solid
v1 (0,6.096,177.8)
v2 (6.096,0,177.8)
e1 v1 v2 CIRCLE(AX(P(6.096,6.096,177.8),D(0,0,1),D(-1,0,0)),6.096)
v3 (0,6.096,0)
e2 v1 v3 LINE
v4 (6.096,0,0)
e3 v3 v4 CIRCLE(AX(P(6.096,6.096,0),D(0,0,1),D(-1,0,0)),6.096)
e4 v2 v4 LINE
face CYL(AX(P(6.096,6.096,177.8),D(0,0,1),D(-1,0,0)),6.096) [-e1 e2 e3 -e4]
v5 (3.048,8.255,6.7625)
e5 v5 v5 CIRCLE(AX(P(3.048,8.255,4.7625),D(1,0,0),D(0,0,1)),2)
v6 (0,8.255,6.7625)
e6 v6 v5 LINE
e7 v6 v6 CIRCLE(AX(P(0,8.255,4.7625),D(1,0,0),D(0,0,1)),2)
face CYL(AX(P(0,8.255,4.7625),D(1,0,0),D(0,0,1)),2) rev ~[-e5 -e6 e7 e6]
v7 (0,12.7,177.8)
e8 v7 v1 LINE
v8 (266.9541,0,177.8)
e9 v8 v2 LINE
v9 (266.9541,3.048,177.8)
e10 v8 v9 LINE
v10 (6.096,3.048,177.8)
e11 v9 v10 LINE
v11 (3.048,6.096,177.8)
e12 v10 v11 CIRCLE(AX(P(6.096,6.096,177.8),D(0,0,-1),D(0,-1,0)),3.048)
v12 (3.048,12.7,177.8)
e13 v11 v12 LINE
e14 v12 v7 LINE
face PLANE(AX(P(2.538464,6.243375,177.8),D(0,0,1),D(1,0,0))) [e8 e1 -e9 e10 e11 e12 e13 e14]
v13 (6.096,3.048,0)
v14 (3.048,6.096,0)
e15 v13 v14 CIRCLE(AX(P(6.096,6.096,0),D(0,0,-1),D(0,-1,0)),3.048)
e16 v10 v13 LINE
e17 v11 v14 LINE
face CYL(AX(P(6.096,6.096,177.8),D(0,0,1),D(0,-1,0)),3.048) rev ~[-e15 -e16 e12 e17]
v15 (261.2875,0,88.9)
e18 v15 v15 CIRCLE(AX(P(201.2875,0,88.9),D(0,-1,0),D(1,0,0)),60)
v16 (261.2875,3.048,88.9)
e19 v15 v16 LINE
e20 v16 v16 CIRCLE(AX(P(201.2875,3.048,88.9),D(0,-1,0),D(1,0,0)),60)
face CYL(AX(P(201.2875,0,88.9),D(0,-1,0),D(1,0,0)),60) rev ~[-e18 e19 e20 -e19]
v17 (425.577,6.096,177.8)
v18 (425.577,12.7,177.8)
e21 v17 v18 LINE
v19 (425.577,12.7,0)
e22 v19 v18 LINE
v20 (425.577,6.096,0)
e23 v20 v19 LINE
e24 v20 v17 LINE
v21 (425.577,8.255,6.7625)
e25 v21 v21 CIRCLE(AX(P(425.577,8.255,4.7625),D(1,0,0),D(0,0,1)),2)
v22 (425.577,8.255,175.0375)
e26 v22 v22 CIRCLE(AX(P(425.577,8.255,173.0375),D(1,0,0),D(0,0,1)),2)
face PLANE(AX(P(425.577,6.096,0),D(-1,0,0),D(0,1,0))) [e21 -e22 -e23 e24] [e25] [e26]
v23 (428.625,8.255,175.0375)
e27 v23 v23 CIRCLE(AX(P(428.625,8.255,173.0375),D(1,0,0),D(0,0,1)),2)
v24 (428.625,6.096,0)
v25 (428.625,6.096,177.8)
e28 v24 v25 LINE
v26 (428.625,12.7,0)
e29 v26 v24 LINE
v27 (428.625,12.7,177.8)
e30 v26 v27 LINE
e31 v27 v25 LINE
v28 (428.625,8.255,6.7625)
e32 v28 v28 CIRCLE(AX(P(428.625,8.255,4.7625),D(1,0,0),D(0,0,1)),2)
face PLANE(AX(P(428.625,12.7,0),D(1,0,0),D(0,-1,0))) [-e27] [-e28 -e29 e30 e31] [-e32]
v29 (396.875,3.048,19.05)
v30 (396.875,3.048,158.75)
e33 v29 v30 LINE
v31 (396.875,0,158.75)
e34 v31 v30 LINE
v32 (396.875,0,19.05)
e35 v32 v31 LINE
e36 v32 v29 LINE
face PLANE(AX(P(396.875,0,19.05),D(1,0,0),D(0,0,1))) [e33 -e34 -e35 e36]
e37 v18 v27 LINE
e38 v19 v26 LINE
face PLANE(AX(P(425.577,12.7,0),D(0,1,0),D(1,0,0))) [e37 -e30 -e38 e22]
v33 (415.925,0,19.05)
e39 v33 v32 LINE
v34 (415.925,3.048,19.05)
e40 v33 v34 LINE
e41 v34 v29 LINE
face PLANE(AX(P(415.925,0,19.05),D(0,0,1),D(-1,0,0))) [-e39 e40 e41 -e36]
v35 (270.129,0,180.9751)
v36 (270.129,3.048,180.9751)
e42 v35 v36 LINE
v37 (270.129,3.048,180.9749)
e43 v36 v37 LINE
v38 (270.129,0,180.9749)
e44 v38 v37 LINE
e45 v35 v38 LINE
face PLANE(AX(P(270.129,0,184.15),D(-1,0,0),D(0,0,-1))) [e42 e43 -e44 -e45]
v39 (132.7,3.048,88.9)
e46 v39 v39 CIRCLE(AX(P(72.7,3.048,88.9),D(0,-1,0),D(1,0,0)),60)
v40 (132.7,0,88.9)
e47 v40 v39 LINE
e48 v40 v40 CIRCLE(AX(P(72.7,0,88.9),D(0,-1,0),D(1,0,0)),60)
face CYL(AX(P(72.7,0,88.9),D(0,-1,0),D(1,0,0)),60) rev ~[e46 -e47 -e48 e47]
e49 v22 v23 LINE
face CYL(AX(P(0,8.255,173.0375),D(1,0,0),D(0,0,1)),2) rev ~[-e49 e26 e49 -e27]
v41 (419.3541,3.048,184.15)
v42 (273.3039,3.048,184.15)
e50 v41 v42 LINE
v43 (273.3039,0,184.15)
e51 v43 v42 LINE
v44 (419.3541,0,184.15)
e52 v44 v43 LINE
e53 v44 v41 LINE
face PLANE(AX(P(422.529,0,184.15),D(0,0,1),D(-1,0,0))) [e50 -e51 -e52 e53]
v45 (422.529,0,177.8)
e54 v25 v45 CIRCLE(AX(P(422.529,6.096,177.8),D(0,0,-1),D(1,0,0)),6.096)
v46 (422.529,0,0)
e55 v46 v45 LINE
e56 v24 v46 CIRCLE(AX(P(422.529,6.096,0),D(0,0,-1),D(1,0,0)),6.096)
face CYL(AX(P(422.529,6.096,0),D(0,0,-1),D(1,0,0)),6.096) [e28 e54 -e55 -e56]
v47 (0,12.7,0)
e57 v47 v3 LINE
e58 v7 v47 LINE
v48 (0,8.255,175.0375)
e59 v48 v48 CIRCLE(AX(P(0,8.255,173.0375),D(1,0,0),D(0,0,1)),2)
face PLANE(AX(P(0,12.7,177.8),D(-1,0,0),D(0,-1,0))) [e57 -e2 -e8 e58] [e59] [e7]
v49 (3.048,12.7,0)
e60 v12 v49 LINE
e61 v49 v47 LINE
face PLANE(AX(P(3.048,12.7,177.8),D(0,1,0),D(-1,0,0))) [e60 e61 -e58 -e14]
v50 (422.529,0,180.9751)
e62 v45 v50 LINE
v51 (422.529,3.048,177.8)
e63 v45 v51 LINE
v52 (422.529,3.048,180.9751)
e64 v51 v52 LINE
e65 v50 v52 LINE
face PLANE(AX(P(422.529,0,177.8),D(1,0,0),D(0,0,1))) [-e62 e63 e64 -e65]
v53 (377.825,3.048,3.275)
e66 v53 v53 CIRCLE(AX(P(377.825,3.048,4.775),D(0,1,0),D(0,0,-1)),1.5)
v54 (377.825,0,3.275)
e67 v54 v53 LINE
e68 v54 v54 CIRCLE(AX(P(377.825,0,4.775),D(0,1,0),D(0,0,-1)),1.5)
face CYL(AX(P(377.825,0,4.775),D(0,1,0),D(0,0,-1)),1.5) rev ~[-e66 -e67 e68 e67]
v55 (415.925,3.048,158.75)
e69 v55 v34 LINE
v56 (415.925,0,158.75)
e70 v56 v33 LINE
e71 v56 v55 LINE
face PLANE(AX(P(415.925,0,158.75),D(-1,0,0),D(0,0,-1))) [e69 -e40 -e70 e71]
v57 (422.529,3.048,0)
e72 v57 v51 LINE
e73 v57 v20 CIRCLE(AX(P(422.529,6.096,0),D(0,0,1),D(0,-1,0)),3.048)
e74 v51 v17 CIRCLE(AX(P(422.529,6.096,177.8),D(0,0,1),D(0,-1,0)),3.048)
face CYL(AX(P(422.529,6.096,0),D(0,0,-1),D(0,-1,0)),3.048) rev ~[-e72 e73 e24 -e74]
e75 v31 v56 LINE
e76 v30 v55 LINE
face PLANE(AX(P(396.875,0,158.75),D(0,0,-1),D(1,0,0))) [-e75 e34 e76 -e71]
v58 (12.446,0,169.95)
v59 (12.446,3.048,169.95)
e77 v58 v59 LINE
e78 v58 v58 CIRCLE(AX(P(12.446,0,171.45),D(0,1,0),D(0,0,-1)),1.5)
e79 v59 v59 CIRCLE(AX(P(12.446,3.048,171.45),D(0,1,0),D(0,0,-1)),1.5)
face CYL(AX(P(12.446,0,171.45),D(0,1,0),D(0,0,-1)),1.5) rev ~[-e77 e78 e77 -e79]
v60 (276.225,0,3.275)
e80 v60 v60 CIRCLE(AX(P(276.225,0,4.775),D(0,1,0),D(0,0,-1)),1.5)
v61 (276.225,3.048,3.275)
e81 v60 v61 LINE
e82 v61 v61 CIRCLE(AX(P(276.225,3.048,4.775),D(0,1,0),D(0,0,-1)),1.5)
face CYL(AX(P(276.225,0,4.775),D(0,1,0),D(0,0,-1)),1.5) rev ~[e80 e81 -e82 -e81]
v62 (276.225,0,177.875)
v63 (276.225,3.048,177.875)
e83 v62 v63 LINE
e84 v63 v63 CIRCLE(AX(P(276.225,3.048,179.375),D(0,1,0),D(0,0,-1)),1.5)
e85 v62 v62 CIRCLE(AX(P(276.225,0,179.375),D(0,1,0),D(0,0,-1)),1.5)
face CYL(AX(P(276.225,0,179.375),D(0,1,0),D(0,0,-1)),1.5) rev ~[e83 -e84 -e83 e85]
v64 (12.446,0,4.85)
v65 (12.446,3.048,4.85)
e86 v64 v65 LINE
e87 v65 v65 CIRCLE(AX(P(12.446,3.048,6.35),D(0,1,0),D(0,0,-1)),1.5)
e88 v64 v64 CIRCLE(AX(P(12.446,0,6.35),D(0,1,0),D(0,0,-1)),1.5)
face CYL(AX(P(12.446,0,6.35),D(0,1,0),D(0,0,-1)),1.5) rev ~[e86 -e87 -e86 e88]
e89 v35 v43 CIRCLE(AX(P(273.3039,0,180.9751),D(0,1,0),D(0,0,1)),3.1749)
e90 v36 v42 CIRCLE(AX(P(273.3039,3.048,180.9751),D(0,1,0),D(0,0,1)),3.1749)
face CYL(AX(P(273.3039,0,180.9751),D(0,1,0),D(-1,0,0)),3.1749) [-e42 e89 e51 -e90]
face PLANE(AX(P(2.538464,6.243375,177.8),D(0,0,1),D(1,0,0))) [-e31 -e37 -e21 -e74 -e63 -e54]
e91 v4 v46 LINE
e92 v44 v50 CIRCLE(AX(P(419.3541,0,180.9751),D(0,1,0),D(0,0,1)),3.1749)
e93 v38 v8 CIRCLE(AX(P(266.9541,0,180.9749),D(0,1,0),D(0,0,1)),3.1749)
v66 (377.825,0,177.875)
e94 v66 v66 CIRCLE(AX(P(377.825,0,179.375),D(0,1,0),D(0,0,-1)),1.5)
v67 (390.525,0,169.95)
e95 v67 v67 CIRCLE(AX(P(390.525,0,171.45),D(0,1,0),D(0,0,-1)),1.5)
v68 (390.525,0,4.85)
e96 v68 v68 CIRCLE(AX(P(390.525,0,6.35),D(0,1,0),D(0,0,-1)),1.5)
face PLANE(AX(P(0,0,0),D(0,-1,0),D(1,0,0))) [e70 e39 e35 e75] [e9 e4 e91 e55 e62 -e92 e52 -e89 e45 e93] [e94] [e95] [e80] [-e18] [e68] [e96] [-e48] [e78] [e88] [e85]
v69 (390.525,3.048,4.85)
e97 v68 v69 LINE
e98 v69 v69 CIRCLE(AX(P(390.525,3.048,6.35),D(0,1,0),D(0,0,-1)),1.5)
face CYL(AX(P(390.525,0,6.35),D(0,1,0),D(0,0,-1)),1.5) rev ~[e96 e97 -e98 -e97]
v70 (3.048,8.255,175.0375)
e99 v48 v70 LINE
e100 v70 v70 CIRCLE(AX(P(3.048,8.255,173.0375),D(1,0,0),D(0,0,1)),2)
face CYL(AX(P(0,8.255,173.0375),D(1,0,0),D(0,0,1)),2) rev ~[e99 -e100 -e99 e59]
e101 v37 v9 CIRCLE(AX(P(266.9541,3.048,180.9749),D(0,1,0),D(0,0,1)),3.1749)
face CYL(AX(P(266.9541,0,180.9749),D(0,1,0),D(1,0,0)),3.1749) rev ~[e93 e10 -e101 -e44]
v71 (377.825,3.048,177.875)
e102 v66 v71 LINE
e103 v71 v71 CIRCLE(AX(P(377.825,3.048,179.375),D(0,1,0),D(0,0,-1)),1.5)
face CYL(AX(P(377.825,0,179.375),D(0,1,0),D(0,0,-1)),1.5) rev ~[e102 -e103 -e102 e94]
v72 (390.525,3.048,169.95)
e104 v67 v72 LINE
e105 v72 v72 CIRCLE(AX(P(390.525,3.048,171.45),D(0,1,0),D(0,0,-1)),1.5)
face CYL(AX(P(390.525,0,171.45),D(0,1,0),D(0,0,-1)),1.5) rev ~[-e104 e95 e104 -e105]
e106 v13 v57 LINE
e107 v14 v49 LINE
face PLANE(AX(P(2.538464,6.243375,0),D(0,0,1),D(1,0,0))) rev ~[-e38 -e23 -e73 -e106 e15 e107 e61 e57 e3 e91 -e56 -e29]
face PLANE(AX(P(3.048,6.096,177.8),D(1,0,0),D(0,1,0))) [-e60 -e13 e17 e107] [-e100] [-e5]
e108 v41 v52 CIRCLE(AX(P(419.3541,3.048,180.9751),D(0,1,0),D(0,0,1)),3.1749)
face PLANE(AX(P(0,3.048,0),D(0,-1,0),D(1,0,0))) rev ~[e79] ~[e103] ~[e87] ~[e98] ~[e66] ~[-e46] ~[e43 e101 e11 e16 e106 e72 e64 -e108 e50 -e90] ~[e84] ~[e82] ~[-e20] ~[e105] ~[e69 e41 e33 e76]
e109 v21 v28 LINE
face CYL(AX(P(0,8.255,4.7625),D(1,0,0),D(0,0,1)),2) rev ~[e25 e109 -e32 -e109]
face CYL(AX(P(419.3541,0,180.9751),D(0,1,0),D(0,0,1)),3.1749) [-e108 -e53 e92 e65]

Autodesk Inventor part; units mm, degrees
ref_plane "YZ Plane" through (0, 0, 0) normal (1, 0, 0) x (0, 1, 0)
ref_plane "XZ Plane" through (0, 0, 0) normal (0, 1, 0) x (-1, 0, 0)
ref_plane "XY Plane" through (0, 0, 0) normal (0, 0, 1) x (1, 0, 0)
sketch "Sketch1" plane through (0, 0, 0) normal (0, 1, 0) x (-1, 0, 0)
  line L0 (0, 0) -> (-428.625, 0)
  line L1 (-428.625, 0) -> (-428.625, 177.8)
  line L2 (-428.625, 177.8) -> (0, 177.8)
  line L3 (0, 177.8) -> (0, 0)
  dimension "d0" = 428.625
  dimension "d1" = 177.8
extrude "Plate1" add sketch "Sketch1" along normal blind 3.048
sketch "Sketch2" plane through (3.048, 0, 177.8) normal (-1, 0, 0) x (0, -1, 0)
  line L0 (0, -177.8) -> (0, 0)
  line L1 (0, 0) -> (-12.7, 0)
  line L2 (-12.7, 0) -> (-12.7, -177.8)
  line L3 (-12.7, -177.8) -> (0, -177.8)
edge flange "Flange1" height 12.7 angle 90 thickness 3.048 bend radius 3.048 thickness toward (-1, 0, 0) relief straight relief width 3.048 relief depth 1.524 corner gap 3.048 corner form 0 edges at (0, 3.048, 88.9) (428.625, 3.048, 88.9) wall of the first edge with corners at (3.048, 0, 0) (3.048, 0, 177.8) (3.048, 12.7, 177.8) (3.048, 12.7, 0)
bend "Bend1"
corner "Corner1"
sketch "Sketch3" plane through (0, 12.7, 0) normal (-1, 0, 0) x (0, 0, 1)
  line L0 (0, -6.604) -> (0, 0) projected
  line L1 (0, 0) -> (177.8, 0) projected
  line L2 (177.8, -12.7) -> (0, -12.7) projected
  line L3 (177.8, 0) -> (177.8, -6.604) projected
  line L4 (4.7625, -4.445) -> (173.0375, -4.445) construction
  line L5 (88.9, 0) -> (88.9, -12.7) construction
  dimension "d13" = 168.275
  dimension "d14" = 4.445
hole "Hole1" at (0, 8.255, 4.7625) at (0, 8.255, 173.0375) direction (1, 0, 0) diameter 4 end through all
sketch "Sketch4" plane through (0, 0, 0) normal (0, -1, 0) x (1, 0, 0)
  line L0 (428.625, 177.8) -> (428.625, 0) projected
  line L1 (0, 0) -> (0, 177.8) projected
  line L2 (422.529, 177.8) -> (6.096, 177.8) projected
  line L3 (6.096, 0) -> (422.529, 0) projected
  line L4 (422.529, 0) -> (422.529, 177.8) projected
  line L5 (396.875, 158.75) -> (415.925, 158.75)
  line L6 (415.925, 158.75) -> (415.925, 19.05)
  line L7 (415.925, 19.05) -> (396.875, 19.05)
  line L8 (396.875, 19.05) -> (396.875, 158.75)
  dimension "d22" = 31.75
  dimension "d23" = 19.05
  dimension "d24" = 19.05
  dimension "d25" = 19.05
extrude "Cut1" cut sketch "Sketch4" against normal blind 3.048
sketch "Sketch5" plane through (0, 0, 0) normal (0, -1, 0) x (1, 0, 0)
  line L0 (422.529, 177.8) -> (6.096, 177.8) projected
  line L1 (6.096, 177.8) -> (6.096, 0) construction
  line L2 (6.096, 0) -> (422.529, 0) projected
  line L3 (422.529, 0) -> (422.529, 177.8) projected
  line L4 (12.446, 171.45) -> (390.525, 171.45) construction
  line L5 (390.525, 171.45) -> (390.525, 6.35) construction
  line L6 (390.525, 6.35) -> (12.446, 6.35) construction
  line L7 (12.446, 6.35) -> (12.446, 171.45) construction
  line L8 (396.875, 19.05) -> (396.875, 158.75) projected
  point P0 (0, 0)
  dimension "d28" = 6.35
  dimension "d29" = 6.35
  dimension "d30" = 6.35
  dimension "d31" = 6.35
hole "Hole2" at (12.446, 0, 171.45) at (12.446, 0, 6.35) at (390.525, 0, 6.35) at (390.525, 0, 171.45) direction (0, 1, 0) diameter 3 end through all
sketch "Sketch6" plane through (0, 0, 0) normal (0, -1, 0) x (1, 0, 0)
  line L0 (422.529, 177.8) -> (6.096, 177.8) projected
  line L1 (6.096, 177.8) -> (6.096, 0) projected
  line L2 (422.529, 0) -> (422.529, 177.8) projected
  line L3 (6.096, 0) -> (422.529, 0) projected
  circle A0 centre (72.7, 88.9) radius 60
  circle A1 centre (201.2875, 88.9) radius 60
  circle A2 centre (329.875, 88.9) radius 60
  line L4 (72.7, 88.9) -> (329.875, 88.9) construction
  line L5 (12.7, 177.8) -> (12.7, 0) construction
  line L6 (0, 0) -> (0, 177.8) projected
  dimension "d39" = 120
  dimension "d40" = 120
  dimension "d41" = 120
  dimension "d42" = 257.175
  dimension "d43" = 128.5875
  dimension "d44" = 177.8
  dimension "d45" = 88.9
  dimension "d46" = 12.7
extrude "Cut2" cut sketch "Sketch6" against normal blind 3.048 contours A0 | A1
sketch "Sketch8" plane through (0, 0, 0) normal (0, -1, 0) x (1, 0, 0)
  line L0 (422.529, 177.8) -> (6.096, 177.8)
  line L1 (422.529, 177.8) -> (6.096, 177.8)
  line L2 (270.129, 177.8) -> (422.529, 177.8)
  line L3 (422.529, 177.8) -> (422.529, 184.15)
  line L4 (422.529, 184.15) -> (270.129, 184.15)
  line L5 (270.129, 184.15) -> (270.129, 177.8)
  point P0 (0, 0)
  dimension "d55" = 6.35
  dimension "d56" = 152.4
sheet face with bend "Face2" sketch "Sketch8" thickness 3.048 toward (0, 1, 0) bend radius 3.048
bend "Bend2"
sketch "Sketch7" plane through (0, 0, 0) normal (0, -1, 0) x (1, 0, 0)
  line L0 (422.529, 177.8) -> (6.096, 177.8) construction
  line L1 (6.096, 0) -> (422.529, 0) construction
  line L2 (396.875, 19.05) -> (396.875, 158.75) construction
  line L3 (276.225, 179.375) -> (377.825, 179.375) construction
  line L4 (377.825, 179.375) -> (377.825, 4.775) construction
  line L5 (377.825, 4.775) -> (276.225, 4.775) construction
  line L6 (276.225, 4.775) -> (276.225, 179.375) construction
  line L7 (276.225, 92.075) -> (377.825, 92.075) construction
  point P0 (0, 0)
  dimension "d49" = 101.6
  dimension "d50" = 174.6
  dimension "d51" = 177.8
  dimension "d52" = 85.725
  dimension "d53" = 19.05
hole "Hole3" at (276.225, 0, 179.375) at (377.825, 0, 179.375) at (377.825, 0, 4.775) at (276.225, 0, 4.775) at (276.225, 0, 179.375) direction (0, 1, 0) diameter 3 end through all
fillet "Corner Round1" radius 3.175 3 edges at (270.129, 1.524, 184.15) (270.129, 1.524, 177.8) (422.529, 1.524, 184.15)
equation "\"d20\" = Thickness"
equation "\"d25\" = d24"
equation "\"d26\" = Thickness"
equation "\"d29\" = d28"
equation "\"d30\" = d28"
equation "\"d31\" = d28"
equation "\"d37\" = Thickness"
equation "\"d43\" = 0.5 * d42"
equation "\"d45\" = 0.5 * d44"
equation "\"d47\" = Thickness"
equation "\"d67\" = Thickness"
equation "\"d2\" = Thickness"
equation "\"d3\" = BendReliefWidth"
equation "\"d4\" = BendReliefDepth"
equation "\"d5\" = MinimumRemnant"
equation "\"d6\" = TransitionRadius"
equation "\"d9\" = BendRadius"
equation "\"d10\" = CornerReliefSize"
equation "\"d11\" = GapSize"
equation "\"d12\" = JacobiRadiusSize"
equation "\"d57\" = BendRadius"
equation "\"d58\" = BendReliefWidth"
equation "\"d60\" = MinimumRemnant"
equation "\"d59\" = BendReliefDepth"
equation "\"d61\" = TransitionRadius"
equation "\"BendRadius\" = Thickness"
equation "\"BendReliefWidth\" = Thickness"
equation "\"BendReliefDepth\" = 0.5 * Thickness"
equation "\"CornerReliefSize\" = 4 * Thickness"
equation "\"MinimumRemnant\" = 2 * Thickness"
equation "\"TransitionRadius\" = BendRadius"
equation "\"JacobiRadiusSize\" = Thickness"
equation "\"GapSize\" = Thickness"
equation "\"Thickness\" = 3.048"
properties part number "Plate"
